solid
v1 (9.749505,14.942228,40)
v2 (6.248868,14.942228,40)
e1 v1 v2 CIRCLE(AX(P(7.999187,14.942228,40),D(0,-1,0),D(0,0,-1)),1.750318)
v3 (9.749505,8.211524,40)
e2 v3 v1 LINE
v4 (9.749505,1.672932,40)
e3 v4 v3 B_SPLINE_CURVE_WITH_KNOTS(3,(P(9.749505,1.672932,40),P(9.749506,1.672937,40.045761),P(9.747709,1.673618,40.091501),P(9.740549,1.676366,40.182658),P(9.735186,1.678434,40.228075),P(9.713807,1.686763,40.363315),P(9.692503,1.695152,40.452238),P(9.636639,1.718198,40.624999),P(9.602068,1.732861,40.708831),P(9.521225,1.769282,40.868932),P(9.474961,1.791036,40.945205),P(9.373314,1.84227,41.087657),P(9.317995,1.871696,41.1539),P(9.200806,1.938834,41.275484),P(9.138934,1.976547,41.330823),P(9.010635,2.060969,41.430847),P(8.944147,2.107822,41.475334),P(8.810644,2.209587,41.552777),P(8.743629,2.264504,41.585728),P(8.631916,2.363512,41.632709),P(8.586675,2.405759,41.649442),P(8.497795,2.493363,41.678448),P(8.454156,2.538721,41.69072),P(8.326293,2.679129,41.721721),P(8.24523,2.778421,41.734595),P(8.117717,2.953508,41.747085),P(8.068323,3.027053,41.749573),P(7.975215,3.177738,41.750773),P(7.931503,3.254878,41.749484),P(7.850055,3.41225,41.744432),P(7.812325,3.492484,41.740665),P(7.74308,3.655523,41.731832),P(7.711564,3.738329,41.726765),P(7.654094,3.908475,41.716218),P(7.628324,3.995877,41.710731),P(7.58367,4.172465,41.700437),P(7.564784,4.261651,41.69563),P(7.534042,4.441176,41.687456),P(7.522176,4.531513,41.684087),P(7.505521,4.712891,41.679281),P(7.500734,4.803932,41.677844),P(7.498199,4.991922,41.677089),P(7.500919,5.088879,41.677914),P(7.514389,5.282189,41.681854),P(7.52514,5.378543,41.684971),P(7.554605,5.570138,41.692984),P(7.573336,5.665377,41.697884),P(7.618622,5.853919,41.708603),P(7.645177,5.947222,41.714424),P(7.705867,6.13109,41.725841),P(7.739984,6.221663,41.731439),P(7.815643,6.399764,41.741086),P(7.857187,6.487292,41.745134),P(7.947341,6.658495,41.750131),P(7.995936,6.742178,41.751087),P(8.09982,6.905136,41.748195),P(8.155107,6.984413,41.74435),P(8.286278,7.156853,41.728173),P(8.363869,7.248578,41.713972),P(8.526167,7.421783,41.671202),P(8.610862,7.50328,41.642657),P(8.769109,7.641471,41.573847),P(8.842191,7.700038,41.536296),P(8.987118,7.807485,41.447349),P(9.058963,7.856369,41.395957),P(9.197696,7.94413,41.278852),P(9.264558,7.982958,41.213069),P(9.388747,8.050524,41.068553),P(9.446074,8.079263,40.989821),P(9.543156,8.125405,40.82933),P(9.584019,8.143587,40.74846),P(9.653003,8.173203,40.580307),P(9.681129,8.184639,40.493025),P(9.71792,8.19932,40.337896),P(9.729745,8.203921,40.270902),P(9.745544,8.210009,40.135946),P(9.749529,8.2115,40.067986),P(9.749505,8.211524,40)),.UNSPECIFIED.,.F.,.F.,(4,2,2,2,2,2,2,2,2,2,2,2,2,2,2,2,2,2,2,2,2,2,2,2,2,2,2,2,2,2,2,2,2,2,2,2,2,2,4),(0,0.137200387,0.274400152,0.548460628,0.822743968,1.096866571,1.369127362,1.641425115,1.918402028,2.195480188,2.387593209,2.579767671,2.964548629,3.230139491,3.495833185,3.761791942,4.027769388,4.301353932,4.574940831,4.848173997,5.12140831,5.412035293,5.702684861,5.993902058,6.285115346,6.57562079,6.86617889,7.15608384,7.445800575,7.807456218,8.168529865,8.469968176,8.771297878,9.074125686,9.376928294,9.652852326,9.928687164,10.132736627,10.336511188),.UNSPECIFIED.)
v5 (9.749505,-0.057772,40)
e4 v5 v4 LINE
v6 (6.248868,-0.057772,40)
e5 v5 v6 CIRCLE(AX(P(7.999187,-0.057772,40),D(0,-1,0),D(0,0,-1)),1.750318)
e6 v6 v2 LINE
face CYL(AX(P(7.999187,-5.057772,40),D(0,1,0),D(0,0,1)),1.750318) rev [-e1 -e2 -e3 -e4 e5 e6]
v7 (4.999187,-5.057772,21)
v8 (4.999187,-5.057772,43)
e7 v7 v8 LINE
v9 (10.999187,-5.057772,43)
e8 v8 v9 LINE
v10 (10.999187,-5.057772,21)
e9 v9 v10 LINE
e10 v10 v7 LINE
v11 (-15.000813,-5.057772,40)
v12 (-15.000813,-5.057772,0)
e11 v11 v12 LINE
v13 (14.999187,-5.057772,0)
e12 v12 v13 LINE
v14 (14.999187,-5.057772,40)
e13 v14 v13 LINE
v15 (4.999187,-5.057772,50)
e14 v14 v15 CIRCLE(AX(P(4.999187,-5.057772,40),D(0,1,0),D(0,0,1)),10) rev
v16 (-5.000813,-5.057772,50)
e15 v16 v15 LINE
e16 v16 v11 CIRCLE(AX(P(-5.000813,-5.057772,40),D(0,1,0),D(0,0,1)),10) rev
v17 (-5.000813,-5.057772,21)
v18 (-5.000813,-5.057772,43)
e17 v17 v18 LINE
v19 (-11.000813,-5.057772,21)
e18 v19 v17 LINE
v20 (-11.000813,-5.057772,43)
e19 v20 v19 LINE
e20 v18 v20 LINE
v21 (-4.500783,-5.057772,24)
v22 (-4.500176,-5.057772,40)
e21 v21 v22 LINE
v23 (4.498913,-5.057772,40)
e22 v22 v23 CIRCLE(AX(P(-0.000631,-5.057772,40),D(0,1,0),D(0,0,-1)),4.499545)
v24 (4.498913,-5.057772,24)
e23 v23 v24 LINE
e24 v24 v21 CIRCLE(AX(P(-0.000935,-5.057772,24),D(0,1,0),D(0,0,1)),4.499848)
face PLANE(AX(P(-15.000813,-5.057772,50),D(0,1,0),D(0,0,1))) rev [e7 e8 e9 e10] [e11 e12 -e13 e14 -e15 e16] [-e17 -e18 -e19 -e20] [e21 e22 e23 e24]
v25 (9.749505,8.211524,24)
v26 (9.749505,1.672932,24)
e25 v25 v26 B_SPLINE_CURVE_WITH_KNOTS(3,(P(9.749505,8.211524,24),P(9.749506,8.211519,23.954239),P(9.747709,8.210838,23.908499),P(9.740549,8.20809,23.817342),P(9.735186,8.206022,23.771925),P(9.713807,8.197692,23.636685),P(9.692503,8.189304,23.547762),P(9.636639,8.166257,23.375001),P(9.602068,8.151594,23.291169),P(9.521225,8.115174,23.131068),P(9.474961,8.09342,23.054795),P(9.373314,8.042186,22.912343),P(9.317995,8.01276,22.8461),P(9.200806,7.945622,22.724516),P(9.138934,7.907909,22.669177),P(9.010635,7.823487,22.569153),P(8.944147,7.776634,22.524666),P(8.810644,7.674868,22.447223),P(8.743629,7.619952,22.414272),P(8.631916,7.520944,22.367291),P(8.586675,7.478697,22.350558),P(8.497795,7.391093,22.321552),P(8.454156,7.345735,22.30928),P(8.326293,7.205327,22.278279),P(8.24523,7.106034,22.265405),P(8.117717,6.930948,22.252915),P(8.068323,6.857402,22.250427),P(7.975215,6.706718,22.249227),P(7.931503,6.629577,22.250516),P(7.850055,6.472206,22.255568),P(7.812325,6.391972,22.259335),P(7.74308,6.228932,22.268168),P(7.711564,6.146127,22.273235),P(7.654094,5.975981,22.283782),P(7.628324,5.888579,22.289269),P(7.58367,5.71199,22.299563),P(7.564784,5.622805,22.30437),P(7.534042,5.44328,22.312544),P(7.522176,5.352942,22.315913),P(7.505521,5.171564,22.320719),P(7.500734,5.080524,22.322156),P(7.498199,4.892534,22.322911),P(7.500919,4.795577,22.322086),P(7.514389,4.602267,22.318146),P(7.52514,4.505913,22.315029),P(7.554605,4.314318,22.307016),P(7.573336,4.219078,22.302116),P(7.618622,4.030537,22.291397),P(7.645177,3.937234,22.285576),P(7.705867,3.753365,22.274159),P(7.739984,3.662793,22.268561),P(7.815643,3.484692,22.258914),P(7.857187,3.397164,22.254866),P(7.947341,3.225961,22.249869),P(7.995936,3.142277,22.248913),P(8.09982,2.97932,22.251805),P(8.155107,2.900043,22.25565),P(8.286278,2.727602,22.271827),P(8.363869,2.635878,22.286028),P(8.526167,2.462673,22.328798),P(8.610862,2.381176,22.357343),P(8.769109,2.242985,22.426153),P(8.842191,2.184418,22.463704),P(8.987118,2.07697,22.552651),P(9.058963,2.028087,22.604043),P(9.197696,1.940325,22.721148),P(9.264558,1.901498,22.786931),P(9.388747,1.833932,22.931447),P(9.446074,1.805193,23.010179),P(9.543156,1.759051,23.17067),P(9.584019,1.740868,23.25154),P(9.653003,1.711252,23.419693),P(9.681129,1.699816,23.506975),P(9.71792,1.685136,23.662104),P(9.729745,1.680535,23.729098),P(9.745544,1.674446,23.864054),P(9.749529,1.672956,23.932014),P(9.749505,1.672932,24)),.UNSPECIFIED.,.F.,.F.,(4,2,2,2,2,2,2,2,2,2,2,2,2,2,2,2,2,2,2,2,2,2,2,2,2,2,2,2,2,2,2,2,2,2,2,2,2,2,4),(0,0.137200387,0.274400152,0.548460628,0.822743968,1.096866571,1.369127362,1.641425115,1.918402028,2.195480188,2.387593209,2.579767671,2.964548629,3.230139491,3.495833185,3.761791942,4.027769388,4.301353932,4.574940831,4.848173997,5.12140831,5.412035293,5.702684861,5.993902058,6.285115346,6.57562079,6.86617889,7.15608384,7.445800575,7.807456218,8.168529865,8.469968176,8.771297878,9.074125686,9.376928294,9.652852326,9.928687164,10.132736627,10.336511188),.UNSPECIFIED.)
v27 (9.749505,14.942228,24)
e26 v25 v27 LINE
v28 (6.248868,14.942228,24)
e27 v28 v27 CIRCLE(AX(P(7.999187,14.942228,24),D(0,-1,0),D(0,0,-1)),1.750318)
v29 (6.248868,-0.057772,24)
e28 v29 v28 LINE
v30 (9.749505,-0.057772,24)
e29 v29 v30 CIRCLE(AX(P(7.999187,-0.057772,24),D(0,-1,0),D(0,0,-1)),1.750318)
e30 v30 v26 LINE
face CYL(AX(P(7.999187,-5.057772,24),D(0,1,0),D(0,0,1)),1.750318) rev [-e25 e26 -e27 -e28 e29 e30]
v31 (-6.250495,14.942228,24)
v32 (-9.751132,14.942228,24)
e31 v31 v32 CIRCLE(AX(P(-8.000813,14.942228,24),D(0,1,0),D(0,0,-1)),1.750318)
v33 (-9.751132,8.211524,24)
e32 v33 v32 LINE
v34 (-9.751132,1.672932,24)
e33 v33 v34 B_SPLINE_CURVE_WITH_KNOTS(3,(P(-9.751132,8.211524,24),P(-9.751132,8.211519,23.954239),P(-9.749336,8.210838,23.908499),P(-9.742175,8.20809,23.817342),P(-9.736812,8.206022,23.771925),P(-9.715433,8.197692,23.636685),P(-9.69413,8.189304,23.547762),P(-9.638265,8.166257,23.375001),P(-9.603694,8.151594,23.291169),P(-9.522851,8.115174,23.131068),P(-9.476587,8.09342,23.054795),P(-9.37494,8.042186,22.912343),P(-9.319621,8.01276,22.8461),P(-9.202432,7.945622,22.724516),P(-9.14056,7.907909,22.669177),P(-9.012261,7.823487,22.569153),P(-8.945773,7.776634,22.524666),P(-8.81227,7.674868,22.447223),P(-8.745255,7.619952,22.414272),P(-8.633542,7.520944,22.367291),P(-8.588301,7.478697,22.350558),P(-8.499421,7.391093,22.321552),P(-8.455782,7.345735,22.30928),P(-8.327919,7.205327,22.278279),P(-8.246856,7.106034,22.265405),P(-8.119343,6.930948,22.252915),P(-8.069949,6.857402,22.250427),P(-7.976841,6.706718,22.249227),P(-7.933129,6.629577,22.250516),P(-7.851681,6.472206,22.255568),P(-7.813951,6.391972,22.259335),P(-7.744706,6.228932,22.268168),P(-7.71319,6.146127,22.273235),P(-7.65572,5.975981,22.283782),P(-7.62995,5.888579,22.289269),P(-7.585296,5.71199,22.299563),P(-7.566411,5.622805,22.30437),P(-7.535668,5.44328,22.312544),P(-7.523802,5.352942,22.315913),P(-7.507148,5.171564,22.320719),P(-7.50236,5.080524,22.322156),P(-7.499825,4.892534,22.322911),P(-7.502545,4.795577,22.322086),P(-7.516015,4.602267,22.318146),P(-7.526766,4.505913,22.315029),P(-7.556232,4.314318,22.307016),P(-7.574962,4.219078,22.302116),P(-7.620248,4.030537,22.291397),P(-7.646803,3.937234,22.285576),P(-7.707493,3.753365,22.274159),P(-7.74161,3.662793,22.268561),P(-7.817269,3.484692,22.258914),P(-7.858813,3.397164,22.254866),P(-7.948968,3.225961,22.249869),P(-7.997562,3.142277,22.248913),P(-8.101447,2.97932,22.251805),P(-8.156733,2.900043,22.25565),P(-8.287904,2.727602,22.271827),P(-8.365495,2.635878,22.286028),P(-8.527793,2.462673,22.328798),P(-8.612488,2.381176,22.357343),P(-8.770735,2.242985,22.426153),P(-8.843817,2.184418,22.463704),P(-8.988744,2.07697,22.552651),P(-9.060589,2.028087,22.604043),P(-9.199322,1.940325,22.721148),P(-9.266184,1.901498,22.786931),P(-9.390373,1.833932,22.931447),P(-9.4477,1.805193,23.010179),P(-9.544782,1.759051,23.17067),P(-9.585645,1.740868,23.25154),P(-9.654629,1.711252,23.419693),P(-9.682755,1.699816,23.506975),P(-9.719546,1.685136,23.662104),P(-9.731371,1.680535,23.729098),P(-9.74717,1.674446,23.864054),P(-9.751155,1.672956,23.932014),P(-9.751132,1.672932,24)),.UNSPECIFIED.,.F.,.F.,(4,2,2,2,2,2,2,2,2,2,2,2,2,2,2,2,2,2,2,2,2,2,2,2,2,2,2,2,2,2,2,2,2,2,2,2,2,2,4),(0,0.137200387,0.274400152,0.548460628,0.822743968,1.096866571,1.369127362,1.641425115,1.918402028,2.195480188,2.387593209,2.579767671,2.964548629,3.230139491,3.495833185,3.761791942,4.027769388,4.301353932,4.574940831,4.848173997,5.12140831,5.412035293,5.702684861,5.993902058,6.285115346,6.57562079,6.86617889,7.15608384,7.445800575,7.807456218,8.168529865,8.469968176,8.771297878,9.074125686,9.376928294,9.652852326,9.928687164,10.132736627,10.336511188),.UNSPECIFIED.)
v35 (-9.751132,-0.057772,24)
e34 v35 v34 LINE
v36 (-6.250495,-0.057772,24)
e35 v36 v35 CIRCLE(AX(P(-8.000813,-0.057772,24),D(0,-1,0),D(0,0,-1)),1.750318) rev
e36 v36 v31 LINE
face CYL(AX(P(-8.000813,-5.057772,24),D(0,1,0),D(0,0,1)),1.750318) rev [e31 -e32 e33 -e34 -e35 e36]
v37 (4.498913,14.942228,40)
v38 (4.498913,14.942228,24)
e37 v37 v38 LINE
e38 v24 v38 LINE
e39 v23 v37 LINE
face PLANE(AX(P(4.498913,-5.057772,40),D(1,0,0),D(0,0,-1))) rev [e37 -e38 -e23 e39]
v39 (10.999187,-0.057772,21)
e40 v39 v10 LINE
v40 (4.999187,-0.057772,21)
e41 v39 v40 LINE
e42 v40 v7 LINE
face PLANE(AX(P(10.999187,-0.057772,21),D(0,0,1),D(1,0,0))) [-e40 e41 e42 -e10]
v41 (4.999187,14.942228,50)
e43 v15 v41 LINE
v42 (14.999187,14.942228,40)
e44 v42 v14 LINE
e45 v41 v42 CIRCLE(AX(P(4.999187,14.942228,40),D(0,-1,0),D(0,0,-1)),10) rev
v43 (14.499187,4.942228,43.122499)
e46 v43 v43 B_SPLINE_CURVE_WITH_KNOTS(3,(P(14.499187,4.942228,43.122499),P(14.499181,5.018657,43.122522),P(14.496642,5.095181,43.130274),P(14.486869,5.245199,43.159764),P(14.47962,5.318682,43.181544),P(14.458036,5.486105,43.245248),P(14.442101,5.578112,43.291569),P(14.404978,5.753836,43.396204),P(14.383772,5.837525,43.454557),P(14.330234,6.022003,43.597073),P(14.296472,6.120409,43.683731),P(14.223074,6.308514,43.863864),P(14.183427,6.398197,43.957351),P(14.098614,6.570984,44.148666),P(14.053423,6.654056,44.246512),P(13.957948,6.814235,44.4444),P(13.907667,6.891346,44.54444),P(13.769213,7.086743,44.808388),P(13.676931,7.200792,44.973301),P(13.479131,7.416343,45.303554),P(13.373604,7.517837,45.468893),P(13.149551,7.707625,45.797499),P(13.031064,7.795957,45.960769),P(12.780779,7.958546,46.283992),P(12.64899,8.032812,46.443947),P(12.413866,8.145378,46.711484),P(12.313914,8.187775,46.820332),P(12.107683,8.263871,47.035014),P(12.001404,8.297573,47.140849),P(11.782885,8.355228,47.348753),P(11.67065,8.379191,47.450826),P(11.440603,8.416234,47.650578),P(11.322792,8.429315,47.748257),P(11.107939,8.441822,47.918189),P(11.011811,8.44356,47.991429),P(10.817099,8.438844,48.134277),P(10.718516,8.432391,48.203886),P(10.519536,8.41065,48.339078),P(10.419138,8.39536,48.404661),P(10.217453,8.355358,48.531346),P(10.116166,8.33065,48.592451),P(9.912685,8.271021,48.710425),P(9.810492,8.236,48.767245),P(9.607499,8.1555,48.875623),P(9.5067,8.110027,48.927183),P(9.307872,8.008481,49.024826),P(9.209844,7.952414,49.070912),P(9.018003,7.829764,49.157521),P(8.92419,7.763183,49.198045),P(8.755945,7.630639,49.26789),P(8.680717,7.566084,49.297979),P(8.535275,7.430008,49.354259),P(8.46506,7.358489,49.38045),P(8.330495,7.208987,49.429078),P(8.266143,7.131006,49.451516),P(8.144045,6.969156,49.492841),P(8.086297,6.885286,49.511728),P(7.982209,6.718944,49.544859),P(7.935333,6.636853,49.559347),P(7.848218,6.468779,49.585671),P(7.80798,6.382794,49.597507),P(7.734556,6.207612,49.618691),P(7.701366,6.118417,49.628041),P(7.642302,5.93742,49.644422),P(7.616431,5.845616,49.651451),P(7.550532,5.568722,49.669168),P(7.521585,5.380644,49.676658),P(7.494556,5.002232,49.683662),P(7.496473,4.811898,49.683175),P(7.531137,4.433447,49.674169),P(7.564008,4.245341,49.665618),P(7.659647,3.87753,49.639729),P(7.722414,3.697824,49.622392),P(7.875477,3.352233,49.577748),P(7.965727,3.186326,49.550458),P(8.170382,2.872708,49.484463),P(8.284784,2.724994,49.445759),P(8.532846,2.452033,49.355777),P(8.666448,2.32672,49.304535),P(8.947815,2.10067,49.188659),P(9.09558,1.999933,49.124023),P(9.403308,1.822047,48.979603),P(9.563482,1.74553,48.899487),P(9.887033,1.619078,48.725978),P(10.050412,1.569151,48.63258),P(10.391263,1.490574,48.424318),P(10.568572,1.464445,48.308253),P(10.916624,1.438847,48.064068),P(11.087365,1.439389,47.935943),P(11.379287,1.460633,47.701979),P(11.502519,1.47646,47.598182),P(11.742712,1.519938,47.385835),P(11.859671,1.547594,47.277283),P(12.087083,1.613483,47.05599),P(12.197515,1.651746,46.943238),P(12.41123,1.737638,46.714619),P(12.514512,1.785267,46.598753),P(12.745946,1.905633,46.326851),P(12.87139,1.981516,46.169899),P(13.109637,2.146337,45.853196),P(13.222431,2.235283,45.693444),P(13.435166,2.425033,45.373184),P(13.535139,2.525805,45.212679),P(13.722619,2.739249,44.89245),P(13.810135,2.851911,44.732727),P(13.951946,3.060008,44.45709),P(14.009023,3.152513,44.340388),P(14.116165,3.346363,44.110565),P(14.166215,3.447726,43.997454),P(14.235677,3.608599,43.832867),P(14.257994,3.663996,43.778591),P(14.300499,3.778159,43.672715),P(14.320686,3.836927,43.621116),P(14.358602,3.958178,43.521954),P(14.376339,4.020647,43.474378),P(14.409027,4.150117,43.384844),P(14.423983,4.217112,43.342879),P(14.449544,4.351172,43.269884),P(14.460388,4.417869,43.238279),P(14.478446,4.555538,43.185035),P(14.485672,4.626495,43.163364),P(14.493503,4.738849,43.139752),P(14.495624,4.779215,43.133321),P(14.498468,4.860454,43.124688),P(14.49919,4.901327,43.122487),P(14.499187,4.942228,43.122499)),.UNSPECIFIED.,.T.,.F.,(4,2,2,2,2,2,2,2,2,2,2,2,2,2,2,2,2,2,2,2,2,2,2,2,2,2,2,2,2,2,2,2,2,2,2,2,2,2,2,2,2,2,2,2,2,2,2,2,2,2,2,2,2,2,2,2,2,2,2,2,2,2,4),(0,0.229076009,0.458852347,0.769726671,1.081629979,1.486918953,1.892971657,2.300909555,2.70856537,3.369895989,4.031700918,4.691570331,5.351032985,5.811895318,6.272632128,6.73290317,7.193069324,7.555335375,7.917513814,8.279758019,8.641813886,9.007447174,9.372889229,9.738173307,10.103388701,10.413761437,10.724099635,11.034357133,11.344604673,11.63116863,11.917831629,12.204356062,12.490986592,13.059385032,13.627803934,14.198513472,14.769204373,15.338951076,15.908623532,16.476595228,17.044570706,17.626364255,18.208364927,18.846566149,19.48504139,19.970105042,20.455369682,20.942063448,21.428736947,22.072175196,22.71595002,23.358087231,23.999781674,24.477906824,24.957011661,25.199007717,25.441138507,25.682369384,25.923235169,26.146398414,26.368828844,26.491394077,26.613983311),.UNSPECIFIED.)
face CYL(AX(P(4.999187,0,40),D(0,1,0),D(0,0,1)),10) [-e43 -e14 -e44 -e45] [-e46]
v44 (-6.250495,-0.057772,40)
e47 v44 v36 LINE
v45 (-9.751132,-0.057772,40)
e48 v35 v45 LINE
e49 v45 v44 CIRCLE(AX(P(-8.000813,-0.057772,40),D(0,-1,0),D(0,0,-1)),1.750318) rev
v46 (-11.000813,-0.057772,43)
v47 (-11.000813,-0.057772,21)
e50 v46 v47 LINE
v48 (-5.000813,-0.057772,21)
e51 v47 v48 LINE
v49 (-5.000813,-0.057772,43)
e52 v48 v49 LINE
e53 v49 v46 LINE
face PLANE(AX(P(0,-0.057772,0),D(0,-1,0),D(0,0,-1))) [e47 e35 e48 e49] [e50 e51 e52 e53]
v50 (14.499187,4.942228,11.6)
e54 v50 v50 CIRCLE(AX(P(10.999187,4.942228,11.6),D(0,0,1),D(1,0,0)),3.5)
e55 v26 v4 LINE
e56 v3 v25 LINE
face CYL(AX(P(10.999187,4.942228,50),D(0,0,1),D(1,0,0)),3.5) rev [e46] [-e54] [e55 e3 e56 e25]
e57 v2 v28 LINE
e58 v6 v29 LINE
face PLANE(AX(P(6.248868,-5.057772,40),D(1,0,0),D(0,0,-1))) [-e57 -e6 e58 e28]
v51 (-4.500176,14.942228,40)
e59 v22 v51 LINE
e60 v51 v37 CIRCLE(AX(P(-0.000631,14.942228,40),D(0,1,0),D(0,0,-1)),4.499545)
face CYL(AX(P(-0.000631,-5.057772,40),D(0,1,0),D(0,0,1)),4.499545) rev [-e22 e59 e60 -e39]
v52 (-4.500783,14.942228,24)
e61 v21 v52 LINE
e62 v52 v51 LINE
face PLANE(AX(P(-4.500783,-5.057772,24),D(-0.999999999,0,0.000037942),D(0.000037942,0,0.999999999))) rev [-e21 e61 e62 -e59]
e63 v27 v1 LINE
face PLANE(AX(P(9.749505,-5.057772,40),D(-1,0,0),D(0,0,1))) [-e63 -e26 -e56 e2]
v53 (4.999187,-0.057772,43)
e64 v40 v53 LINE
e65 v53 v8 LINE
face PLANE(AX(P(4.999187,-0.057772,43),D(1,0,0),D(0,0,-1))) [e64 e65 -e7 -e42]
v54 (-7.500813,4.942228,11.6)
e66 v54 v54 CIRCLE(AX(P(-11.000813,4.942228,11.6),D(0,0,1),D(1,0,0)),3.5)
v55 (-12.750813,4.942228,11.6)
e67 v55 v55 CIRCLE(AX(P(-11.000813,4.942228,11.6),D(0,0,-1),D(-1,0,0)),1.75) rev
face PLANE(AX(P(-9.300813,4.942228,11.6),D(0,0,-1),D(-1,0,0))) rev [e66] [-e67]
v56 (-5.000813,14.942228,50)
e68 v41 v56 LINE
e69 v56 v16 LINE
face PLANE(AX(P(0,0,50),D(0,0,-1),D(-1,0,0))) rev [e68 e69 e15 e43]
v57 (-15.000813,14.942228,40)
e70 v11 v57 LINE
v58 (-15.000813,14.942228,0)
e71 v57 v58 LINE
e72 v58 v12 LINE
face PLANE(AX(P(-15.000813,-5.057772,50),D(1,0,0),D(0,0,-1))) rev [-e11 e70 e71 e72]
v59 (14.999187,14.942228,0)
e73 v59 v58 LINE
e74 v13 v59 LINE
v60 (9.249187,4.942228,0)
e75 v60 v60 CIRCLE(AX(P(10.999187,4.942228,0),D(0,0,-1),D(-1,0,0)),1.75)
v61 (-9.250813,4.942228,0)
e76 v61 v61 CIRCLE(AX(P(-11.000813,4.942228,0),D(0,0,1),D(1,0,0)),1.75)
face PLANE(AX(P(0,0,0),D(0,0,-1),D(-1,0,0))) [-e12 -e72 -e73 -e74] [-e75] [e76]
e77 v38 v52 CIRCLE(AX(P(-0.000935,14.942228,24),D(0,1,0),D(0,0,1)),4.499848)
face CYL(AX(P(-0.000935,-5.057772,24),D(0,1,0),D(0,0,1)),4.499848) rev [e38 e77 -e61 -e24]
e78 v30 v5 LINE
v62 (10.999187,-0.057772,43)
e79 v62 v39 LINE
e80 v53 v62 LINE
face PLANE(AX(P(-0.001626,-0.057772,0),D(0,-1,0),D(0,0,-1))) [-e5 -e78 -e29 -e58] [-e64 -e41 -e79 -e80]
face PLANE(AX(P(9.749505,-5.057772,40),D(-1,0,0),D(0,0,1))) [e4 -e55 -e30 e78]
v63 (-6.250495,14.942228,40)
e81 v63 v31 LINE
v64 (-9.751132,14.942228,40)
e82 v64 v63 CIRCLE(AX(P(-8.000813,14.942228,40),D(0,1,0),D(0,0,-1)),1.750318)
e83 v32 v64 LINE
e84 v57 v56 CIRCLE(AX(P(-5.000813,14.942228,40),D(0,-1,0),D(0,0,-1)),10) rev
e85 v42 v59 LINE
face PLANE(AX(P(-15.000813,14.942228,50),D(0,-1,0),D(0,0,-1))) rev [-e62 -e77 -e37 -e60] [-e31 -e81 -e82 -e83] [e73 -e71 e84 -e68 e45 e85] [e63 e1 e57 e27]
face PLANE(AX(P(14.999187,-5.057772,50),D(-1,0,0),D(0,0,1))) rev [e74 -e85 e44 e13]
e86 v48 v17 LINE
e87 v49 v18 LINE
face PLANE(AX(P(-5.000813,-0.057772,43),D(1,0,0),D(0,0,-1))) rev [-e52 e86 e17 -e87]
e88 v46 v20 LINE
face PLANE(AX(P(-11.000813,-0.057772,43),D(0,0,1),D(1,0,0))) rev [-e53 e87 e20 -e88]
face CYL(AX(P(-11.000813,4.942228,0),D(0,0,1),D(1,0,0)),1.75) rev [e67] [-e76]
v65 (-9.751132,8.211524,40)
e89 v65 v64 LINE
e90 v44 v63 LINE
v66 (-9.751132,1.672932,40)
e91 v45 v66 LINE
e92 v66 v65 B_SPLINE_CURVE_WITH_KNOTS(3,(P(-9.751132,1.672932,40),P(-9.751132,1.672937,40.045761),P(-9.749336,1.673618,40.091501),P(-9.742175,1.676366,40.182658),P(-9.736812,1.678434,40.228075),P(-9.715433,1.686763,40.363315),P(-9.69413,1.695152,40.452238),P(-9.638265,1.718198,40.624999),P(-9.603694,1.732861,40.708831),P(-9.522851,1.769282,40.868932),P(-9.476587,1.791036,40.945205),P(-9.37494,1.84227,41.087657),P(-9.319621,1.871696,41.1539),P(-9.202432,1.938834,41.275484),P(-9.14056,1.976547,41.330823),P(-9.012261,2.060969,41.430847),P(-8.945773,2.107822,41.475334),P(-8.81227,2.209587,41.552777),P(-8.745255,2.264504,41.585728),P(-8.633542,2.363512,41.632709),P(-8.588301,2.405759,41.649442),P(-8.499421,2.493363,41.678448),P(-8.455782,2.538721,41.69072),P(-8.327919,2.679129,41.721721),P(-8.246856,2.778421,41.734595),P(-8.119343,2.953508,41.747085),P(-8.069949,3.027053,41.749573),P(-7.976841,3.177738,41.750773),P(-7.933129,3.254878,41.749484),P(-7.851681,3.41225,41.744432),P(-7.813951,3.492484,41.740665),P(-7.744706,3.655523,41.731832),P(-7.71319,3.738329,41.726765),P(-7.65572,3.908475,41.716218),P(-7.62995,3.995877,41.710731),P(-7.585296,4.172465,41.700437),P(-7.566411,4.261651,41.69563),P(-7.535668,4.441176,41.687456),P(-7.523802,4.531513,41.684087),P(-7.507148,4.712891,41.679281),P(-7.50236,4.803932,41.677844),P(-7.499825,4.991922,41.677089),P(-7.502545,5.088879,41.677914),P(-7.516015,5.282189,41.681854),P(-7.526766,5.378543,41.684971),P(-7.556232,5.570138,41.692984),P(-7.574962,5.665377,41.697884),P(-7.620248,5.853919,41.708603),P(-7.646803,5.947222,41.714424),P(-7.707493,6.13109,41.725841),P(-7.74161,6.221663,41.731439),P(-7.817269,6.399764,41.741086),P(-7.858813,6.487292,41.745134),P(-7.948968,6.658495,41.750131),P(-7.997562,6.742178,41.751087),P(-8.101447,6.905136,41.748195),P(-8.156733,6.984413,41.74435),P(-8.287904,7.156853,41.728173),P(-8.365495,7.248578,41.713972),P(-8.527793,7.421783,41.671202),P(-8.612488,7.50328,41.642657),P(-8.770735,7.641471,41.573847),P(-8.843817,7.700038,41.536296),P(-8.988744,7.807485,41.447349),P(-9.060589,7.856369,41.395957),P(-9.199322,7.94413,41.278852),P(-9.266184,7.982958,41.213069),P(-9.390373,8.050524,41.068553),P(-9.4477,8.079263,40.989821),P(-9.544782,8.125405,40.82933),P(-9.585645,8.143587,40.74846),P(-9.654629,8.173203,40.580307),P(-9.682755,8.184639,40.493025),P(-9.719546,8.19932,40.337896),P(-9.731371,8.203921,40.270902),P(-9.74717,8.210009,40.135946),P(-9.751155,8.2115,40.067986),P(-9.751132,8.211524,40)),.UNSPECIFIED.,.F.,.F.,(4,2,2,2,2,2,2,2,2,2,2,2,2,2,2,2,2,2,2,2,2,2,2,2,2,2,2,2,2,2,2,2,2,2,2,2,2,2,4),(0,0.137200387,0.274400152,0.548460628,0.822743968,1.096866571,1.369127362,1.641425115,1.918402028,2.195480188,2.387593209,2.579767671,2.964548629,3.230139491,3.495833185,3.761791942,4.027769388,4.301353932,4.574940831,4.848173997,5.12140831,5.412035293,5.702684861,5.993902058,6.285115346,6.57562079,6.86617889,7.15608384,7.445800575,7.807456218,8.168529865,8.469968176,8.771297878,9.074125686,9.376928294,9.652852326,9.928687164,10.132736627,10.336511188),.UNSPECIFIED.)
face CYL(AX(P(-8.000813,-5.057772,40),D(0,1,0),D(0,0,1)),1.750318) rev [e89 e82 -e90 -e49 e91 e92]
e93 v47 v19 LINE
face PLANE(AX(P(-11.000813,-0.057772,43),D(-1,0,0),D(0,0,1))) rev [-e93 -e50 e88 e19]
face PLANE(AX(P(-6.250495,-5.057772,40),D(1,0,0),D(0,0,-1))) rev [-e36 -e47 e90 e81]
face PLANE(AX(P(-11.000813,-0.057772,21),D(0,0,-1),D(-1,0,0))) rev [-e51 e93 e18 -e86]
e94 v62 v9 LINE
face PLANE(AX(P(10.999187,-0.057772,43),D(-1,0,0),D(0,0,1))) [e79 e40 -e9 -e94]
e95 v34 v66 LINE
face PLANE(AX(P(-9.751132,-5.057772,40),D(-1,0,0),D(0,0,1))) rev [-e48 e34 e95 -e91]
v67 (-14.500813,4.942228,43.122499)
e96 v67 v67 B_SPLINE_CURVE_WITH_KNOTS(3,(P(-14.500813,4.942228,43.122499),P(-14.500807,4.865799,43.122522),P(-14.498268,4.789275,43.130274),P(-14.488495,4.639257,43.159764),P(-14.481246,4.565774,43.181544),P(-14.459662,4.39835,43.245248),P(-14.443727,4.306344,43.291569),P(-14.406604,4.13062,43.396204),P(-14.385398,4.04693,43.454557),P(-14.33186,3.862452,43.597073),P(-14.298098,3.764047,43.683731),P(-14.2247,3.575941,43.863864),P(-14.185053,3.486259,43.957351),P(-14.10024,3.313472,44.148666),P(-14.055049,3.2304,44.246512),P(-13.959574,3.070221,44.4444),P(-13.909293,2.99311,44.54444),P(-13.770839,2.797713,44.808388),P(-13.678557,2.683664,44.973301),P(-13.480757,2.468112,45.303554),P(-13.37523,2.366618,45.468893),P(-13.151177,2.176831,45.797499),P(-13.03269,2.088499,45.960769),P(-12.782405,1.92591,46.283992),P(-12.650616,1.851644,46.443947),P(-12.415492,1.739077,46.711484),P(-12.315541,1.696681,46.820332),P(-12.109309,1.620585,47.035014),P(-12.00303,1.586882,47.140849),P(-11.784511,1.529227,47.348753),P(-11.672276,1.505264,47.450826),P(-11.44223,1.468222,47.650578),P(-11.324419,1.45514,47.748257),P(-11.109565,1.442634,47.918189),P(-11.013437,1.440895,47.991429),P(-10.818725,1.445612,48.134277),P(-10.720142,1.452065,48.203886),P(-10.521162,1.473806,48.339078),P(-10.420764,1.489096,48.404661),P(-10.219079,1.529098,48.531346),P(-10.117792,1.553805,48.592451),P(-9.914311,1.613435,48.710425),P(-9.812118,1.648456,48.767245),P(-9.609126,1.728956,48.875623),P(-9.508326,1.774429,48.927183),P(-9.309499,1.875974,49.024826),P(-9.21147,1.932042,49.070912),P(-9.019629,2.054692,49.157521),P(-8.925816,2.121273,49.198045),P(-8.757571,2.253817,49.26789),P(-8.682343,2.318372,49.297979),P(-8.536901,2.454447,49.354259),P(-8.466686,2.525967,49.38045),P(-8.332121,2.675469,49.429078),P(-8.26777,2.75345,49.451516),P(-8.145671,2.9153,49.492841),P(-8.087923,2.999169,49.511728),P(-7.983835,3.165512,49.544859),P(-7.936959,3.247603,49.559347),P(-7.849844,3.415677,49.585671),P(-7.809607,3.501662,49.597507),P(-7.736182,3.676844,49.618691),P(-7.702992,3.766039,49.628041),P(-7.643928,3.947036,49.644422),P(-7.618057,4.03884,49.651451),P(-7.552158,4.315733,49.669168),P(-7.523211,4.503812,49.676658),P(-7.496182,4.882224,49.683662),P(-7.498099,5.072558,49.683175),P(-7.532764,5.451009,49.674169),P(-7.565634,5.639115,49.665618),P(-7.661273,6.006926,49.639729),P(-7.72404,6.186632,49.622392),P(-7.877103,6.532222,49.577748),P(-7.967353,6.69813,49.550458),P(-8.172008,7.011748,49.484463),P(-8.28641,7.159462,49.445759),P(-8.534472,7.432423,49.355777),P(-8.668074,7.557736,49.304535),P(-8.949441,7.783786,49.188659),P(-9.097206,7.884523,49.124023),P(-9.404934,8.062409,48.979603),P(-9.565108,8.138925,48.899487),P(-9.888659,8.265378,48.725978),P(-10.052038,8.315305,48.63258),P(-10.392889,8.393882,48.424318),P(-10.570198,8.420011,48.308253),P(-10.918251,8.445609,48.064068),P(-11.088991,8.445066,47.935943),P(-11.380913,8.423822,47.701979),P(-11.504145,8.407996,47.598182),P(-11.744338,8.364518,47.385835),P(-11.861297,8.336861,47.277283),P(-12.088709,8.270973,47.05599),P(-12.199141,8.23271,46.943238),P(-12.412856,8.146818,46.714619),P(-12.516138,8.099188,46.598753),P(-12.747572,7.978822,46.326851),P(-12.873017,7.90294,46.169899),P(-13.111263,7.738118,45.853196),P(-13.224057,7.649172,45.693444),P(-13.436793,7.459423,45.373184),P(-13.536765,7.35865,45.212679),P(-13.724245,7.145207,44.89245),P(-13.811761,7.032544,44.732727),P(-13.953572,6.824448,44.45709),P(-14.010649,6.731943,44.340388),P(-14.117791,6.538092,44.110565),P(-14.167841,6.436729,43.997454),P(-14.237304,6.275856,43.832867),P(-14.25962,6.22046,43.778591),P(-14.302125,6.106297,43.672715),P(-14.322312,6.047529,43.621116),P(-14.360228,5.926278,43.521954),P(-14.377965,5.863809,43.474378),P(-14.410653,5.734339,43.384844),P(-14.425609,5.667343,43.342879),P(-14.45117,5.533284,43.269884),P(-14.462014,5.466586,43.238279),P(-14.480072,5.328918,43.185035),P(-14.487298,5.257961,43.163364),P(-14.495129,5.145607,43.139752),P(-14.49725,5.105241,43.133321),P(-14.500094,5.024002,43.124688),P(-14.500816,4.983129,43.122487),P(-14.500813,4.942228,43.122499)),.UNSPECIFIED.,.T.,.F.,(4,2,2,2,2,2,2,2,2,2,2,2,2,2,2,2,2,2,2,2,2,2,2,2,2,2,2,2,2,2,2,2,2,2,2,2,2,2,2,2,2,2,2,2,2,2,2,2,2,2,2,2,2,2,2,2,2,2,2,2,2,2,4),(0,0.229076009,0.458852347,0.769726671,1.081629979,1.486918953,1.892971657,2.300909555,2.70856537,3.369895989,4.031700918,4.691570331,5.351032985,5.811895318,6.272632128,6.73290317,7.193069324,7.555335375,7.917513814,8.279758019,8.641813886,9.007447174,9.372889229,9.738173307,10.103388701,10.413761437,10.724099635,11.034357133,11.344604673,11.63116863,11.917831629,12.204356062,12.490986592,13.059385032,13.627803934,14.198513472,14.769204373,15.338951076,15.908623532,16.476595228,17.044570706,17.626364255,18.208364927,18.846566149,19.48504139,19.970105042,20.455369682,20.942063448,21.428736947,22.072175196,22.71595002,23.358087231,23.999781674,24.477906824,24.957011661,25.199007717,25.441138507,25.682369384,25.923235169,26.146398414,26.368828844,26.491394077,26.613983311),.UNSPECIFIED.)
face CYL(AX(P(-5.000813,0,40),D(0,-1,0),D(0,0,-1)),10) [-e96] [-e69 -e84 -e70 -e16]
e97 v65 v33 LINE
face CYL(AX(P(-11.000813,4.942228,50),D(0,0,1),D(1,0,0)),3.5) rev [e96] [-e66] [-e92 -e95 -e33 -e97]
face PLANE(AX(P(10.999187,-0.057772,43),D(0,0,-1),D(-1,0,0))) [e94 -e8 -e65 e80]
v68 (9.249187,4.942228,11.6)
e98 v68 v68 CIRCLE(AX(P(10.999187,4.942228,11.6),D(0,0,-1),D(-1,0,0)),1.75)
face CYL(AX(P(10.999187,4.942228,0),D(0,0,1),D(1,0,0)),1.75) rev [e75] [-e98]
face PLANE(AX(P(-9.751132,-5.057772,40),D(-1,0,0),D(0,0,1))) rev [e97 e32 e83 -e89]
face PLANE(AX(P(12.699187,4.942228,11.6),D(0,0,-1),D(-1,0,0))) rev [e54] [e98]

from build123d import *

# Parameters (mm, degrees)
SKETCH1_W                                           = 30
SKETCH1_H                                           = 20
BOSS_EXTRUDE1_DEPTH                                 = 50
CUT_EXTRUDE5_DEPTH                                  = 56.901917603
CUT_EXTRUDE2_DEPTH                                  = 20
SKETCH6_W                                           = 6
SKETCH6_H                                           = 22
CUT_EXTRUDE3_DEPTH                                  = 5
SKETCH7_R                                           = 1.75
CUT_EXTRUDE4_DEPTH                                  = 55.298200385
CBORE_FOR_M3_HEX_SOCKET_HEAD_CAP_SCREW1_D           = 3.4
CBORE_FOR_M3_HEX_SOCKET_HEAD_CAP_SCREW1_CBORE_D     = 7
CBORE_FOR_M3_HEX_SOCKET_HEAD_CAP_SCREW1_CBORE_DEPTH = 38.4
FILLET1_START                                       = -6
FILLET1_DEPTH                                       = 22


with BuildPart() as part:
    # Sketch1 → Boss-Extrude1 (new body)
    with BuildSketch(Plane.XY):
        with Locations((-0.000813035, 4.942227855)):
            Rectangle(SKETCH1_W, SKETCH1_H)
    extrude(amount=BOSS_EXTRUDE1_DEPTH)

    # Sketch3 → Cut-Extrude5 (cut, through all)
    with BuildSketch(Plane(origin=(0, 14.942227855, 0), x_dir=(1, 0, 0), z_dir=(0, 1, 0))):
        with BuildLine():
            Line((-4.500783142, -24.000000003), (-4.500176076, -40))
            ThreePointArc((-4.500176076, -40), (-0.000631376, -44.4995447), (4.498913324, -40))
            Line((4.498913324, -40), (4.498913324, -24.000000003))
            ThreePointArc((4.498913324, -24.000000003), (-0.000934909, -19.50015177), (-4.500783142, -24.000000003))
        make_face()
    extrude(amount=-CUT_EXTRUDE5_DEPTH, mode=Mode.SUBTRACT)

    # Sketch5 → Cut-Extrude2 (cut)
    with BuildSketch(Plane(origin=(0, 14.942227855, 0), x_dir=(1, 0, 0), z_dir=(0, 1, 0))):
        with BuildLine():
            Line((-9.751131515, -40), (-9.751131515, -24.000000003))
            ThreePointArc((-9.751131515, -24.000000003), (-8.000813035, -22.249681523), (-6.250494556, -24.000000003))
            Line((-6.250494556, -24.000000003), (-6.250494556, -40))
            ThreePointArc((-6.250494556, -40), (-8.000813035, -41.75031848), (-9.751131515, -40))
        make_face()
    cut_extrude2 = extrude(amount=-CUT_EXTRUDE2_DEPTH, mode=Mode.SUBTRACT)

    # Sketch6 → Cut-Extrude3 (cut)
    with BuildSketch(Plane.XZ.offset(5.057772145)):
        with Locations((-8.000813035, 32.000000001)):
            Rectangle(SKETCH6_W, SKETCH6_H)
    cut_extrude3 = extrude(amount=-CUT_EXTRUDE3_DEPTH, mode=Mode.SUBTRACT)

    # Sketch7 → Cut-Extrude4 (cut, through all)
    with BuildSketch(Plane.XY.offset(50)):
        with Locations((-11.000813035, 4.942227855)):
            Circle(SKETCH7_R)
    cut_extrude4 = extrude(amount=-CUT_EXTRUDE4_DEPTH, mode=Mode.SUBTRACT)

    # CBORE for M3 Hex Socket Head Cap Screw1 (through all)
    with Locations(Plane.XY.offset(50)):
        with Locations((-11.000813035, 4.942227855)):
            cbore_for_m3_hex_socket_head_cap_screw1 = CounterBoreHole(CBORE_FOR_M3_HEX_SOCKET_HEAD_CAP_SCREW1_D / 2, CBORE_FOR_M3_HEX_SOCKET_HEAD_CAP_SCREW1_CBORE_D / 2, CBORE_FOR_M3_HEX_SOCKET_HEAD_CAP_SCREW1_CBORE_DEPTH)

    # Fillet1: read off the stored shape, not the designer's step
    # Fillet1 outline → Fillet1 (cut)
    with BuildSketch(Plane(origin=(0, 0, 0), x_dir=(1, 0, 0), z_dir=(0, 1, 0)).offset(FILLET1_START)):
        with BuildLine():
            ThreePointArc((14.999186965, -40), (12.070254777, -47.071067812), (4.999186965, -50))
            Line((4.999186965, -50), (14.999186965, -50))
            Line((14.999186965, -50), (14.999186965, -40))
        make_face()
        with BuildLine():
            Line((-15.000813035, -50), (-5.000813035, -50))
            ThreePointArc((-5.000813035, -50), (-12.071880847, -47.071067812), (-15.000813035, -40))
            Line((-15.000813035, -40), (-15.000813035, -50))
        make_face()
    extrude(amount=FILLET1_DEPTH, mode=Mode.SUBTRACT)

    # Mirror1: Cut-Extrude2, Cut-Extrude3, Cut-Extrude4, CBORE for M3 Hex Socket Head Cap Screw1 across plane
    add(cut_extrude2.mirror(Plane(origin=(-0.000813035, 0, 0), x_dir=(0, 0, 1), z_dir=(1, 0, 0))), mode=Mode.SUBTRACT)
    add(cut_extrude3.mirror(Plane(origin=(-0.000813035, 0, 0), x_dir=(0, 0, 1), z_dir=(1, 0, 0))), mode=Mode.SUBTRACT)
    add(cut_extrude4.mirror(Plane(origin=(-0.000813035, 0, 0), x_dir=(0, 0, 1), z_dir=(1, 0, 0))), mode=Mode.SUBTRACT)
    add(cbore_for_m3_hex_socket_head_cap_screw1.mirror(Plane(origin=(-0.000813035, 0, 0), x_dir=(0, 0, 1), z_dir=(1, 0, 0))), mode=Mode.SUBTRACT)


solid = part.part
